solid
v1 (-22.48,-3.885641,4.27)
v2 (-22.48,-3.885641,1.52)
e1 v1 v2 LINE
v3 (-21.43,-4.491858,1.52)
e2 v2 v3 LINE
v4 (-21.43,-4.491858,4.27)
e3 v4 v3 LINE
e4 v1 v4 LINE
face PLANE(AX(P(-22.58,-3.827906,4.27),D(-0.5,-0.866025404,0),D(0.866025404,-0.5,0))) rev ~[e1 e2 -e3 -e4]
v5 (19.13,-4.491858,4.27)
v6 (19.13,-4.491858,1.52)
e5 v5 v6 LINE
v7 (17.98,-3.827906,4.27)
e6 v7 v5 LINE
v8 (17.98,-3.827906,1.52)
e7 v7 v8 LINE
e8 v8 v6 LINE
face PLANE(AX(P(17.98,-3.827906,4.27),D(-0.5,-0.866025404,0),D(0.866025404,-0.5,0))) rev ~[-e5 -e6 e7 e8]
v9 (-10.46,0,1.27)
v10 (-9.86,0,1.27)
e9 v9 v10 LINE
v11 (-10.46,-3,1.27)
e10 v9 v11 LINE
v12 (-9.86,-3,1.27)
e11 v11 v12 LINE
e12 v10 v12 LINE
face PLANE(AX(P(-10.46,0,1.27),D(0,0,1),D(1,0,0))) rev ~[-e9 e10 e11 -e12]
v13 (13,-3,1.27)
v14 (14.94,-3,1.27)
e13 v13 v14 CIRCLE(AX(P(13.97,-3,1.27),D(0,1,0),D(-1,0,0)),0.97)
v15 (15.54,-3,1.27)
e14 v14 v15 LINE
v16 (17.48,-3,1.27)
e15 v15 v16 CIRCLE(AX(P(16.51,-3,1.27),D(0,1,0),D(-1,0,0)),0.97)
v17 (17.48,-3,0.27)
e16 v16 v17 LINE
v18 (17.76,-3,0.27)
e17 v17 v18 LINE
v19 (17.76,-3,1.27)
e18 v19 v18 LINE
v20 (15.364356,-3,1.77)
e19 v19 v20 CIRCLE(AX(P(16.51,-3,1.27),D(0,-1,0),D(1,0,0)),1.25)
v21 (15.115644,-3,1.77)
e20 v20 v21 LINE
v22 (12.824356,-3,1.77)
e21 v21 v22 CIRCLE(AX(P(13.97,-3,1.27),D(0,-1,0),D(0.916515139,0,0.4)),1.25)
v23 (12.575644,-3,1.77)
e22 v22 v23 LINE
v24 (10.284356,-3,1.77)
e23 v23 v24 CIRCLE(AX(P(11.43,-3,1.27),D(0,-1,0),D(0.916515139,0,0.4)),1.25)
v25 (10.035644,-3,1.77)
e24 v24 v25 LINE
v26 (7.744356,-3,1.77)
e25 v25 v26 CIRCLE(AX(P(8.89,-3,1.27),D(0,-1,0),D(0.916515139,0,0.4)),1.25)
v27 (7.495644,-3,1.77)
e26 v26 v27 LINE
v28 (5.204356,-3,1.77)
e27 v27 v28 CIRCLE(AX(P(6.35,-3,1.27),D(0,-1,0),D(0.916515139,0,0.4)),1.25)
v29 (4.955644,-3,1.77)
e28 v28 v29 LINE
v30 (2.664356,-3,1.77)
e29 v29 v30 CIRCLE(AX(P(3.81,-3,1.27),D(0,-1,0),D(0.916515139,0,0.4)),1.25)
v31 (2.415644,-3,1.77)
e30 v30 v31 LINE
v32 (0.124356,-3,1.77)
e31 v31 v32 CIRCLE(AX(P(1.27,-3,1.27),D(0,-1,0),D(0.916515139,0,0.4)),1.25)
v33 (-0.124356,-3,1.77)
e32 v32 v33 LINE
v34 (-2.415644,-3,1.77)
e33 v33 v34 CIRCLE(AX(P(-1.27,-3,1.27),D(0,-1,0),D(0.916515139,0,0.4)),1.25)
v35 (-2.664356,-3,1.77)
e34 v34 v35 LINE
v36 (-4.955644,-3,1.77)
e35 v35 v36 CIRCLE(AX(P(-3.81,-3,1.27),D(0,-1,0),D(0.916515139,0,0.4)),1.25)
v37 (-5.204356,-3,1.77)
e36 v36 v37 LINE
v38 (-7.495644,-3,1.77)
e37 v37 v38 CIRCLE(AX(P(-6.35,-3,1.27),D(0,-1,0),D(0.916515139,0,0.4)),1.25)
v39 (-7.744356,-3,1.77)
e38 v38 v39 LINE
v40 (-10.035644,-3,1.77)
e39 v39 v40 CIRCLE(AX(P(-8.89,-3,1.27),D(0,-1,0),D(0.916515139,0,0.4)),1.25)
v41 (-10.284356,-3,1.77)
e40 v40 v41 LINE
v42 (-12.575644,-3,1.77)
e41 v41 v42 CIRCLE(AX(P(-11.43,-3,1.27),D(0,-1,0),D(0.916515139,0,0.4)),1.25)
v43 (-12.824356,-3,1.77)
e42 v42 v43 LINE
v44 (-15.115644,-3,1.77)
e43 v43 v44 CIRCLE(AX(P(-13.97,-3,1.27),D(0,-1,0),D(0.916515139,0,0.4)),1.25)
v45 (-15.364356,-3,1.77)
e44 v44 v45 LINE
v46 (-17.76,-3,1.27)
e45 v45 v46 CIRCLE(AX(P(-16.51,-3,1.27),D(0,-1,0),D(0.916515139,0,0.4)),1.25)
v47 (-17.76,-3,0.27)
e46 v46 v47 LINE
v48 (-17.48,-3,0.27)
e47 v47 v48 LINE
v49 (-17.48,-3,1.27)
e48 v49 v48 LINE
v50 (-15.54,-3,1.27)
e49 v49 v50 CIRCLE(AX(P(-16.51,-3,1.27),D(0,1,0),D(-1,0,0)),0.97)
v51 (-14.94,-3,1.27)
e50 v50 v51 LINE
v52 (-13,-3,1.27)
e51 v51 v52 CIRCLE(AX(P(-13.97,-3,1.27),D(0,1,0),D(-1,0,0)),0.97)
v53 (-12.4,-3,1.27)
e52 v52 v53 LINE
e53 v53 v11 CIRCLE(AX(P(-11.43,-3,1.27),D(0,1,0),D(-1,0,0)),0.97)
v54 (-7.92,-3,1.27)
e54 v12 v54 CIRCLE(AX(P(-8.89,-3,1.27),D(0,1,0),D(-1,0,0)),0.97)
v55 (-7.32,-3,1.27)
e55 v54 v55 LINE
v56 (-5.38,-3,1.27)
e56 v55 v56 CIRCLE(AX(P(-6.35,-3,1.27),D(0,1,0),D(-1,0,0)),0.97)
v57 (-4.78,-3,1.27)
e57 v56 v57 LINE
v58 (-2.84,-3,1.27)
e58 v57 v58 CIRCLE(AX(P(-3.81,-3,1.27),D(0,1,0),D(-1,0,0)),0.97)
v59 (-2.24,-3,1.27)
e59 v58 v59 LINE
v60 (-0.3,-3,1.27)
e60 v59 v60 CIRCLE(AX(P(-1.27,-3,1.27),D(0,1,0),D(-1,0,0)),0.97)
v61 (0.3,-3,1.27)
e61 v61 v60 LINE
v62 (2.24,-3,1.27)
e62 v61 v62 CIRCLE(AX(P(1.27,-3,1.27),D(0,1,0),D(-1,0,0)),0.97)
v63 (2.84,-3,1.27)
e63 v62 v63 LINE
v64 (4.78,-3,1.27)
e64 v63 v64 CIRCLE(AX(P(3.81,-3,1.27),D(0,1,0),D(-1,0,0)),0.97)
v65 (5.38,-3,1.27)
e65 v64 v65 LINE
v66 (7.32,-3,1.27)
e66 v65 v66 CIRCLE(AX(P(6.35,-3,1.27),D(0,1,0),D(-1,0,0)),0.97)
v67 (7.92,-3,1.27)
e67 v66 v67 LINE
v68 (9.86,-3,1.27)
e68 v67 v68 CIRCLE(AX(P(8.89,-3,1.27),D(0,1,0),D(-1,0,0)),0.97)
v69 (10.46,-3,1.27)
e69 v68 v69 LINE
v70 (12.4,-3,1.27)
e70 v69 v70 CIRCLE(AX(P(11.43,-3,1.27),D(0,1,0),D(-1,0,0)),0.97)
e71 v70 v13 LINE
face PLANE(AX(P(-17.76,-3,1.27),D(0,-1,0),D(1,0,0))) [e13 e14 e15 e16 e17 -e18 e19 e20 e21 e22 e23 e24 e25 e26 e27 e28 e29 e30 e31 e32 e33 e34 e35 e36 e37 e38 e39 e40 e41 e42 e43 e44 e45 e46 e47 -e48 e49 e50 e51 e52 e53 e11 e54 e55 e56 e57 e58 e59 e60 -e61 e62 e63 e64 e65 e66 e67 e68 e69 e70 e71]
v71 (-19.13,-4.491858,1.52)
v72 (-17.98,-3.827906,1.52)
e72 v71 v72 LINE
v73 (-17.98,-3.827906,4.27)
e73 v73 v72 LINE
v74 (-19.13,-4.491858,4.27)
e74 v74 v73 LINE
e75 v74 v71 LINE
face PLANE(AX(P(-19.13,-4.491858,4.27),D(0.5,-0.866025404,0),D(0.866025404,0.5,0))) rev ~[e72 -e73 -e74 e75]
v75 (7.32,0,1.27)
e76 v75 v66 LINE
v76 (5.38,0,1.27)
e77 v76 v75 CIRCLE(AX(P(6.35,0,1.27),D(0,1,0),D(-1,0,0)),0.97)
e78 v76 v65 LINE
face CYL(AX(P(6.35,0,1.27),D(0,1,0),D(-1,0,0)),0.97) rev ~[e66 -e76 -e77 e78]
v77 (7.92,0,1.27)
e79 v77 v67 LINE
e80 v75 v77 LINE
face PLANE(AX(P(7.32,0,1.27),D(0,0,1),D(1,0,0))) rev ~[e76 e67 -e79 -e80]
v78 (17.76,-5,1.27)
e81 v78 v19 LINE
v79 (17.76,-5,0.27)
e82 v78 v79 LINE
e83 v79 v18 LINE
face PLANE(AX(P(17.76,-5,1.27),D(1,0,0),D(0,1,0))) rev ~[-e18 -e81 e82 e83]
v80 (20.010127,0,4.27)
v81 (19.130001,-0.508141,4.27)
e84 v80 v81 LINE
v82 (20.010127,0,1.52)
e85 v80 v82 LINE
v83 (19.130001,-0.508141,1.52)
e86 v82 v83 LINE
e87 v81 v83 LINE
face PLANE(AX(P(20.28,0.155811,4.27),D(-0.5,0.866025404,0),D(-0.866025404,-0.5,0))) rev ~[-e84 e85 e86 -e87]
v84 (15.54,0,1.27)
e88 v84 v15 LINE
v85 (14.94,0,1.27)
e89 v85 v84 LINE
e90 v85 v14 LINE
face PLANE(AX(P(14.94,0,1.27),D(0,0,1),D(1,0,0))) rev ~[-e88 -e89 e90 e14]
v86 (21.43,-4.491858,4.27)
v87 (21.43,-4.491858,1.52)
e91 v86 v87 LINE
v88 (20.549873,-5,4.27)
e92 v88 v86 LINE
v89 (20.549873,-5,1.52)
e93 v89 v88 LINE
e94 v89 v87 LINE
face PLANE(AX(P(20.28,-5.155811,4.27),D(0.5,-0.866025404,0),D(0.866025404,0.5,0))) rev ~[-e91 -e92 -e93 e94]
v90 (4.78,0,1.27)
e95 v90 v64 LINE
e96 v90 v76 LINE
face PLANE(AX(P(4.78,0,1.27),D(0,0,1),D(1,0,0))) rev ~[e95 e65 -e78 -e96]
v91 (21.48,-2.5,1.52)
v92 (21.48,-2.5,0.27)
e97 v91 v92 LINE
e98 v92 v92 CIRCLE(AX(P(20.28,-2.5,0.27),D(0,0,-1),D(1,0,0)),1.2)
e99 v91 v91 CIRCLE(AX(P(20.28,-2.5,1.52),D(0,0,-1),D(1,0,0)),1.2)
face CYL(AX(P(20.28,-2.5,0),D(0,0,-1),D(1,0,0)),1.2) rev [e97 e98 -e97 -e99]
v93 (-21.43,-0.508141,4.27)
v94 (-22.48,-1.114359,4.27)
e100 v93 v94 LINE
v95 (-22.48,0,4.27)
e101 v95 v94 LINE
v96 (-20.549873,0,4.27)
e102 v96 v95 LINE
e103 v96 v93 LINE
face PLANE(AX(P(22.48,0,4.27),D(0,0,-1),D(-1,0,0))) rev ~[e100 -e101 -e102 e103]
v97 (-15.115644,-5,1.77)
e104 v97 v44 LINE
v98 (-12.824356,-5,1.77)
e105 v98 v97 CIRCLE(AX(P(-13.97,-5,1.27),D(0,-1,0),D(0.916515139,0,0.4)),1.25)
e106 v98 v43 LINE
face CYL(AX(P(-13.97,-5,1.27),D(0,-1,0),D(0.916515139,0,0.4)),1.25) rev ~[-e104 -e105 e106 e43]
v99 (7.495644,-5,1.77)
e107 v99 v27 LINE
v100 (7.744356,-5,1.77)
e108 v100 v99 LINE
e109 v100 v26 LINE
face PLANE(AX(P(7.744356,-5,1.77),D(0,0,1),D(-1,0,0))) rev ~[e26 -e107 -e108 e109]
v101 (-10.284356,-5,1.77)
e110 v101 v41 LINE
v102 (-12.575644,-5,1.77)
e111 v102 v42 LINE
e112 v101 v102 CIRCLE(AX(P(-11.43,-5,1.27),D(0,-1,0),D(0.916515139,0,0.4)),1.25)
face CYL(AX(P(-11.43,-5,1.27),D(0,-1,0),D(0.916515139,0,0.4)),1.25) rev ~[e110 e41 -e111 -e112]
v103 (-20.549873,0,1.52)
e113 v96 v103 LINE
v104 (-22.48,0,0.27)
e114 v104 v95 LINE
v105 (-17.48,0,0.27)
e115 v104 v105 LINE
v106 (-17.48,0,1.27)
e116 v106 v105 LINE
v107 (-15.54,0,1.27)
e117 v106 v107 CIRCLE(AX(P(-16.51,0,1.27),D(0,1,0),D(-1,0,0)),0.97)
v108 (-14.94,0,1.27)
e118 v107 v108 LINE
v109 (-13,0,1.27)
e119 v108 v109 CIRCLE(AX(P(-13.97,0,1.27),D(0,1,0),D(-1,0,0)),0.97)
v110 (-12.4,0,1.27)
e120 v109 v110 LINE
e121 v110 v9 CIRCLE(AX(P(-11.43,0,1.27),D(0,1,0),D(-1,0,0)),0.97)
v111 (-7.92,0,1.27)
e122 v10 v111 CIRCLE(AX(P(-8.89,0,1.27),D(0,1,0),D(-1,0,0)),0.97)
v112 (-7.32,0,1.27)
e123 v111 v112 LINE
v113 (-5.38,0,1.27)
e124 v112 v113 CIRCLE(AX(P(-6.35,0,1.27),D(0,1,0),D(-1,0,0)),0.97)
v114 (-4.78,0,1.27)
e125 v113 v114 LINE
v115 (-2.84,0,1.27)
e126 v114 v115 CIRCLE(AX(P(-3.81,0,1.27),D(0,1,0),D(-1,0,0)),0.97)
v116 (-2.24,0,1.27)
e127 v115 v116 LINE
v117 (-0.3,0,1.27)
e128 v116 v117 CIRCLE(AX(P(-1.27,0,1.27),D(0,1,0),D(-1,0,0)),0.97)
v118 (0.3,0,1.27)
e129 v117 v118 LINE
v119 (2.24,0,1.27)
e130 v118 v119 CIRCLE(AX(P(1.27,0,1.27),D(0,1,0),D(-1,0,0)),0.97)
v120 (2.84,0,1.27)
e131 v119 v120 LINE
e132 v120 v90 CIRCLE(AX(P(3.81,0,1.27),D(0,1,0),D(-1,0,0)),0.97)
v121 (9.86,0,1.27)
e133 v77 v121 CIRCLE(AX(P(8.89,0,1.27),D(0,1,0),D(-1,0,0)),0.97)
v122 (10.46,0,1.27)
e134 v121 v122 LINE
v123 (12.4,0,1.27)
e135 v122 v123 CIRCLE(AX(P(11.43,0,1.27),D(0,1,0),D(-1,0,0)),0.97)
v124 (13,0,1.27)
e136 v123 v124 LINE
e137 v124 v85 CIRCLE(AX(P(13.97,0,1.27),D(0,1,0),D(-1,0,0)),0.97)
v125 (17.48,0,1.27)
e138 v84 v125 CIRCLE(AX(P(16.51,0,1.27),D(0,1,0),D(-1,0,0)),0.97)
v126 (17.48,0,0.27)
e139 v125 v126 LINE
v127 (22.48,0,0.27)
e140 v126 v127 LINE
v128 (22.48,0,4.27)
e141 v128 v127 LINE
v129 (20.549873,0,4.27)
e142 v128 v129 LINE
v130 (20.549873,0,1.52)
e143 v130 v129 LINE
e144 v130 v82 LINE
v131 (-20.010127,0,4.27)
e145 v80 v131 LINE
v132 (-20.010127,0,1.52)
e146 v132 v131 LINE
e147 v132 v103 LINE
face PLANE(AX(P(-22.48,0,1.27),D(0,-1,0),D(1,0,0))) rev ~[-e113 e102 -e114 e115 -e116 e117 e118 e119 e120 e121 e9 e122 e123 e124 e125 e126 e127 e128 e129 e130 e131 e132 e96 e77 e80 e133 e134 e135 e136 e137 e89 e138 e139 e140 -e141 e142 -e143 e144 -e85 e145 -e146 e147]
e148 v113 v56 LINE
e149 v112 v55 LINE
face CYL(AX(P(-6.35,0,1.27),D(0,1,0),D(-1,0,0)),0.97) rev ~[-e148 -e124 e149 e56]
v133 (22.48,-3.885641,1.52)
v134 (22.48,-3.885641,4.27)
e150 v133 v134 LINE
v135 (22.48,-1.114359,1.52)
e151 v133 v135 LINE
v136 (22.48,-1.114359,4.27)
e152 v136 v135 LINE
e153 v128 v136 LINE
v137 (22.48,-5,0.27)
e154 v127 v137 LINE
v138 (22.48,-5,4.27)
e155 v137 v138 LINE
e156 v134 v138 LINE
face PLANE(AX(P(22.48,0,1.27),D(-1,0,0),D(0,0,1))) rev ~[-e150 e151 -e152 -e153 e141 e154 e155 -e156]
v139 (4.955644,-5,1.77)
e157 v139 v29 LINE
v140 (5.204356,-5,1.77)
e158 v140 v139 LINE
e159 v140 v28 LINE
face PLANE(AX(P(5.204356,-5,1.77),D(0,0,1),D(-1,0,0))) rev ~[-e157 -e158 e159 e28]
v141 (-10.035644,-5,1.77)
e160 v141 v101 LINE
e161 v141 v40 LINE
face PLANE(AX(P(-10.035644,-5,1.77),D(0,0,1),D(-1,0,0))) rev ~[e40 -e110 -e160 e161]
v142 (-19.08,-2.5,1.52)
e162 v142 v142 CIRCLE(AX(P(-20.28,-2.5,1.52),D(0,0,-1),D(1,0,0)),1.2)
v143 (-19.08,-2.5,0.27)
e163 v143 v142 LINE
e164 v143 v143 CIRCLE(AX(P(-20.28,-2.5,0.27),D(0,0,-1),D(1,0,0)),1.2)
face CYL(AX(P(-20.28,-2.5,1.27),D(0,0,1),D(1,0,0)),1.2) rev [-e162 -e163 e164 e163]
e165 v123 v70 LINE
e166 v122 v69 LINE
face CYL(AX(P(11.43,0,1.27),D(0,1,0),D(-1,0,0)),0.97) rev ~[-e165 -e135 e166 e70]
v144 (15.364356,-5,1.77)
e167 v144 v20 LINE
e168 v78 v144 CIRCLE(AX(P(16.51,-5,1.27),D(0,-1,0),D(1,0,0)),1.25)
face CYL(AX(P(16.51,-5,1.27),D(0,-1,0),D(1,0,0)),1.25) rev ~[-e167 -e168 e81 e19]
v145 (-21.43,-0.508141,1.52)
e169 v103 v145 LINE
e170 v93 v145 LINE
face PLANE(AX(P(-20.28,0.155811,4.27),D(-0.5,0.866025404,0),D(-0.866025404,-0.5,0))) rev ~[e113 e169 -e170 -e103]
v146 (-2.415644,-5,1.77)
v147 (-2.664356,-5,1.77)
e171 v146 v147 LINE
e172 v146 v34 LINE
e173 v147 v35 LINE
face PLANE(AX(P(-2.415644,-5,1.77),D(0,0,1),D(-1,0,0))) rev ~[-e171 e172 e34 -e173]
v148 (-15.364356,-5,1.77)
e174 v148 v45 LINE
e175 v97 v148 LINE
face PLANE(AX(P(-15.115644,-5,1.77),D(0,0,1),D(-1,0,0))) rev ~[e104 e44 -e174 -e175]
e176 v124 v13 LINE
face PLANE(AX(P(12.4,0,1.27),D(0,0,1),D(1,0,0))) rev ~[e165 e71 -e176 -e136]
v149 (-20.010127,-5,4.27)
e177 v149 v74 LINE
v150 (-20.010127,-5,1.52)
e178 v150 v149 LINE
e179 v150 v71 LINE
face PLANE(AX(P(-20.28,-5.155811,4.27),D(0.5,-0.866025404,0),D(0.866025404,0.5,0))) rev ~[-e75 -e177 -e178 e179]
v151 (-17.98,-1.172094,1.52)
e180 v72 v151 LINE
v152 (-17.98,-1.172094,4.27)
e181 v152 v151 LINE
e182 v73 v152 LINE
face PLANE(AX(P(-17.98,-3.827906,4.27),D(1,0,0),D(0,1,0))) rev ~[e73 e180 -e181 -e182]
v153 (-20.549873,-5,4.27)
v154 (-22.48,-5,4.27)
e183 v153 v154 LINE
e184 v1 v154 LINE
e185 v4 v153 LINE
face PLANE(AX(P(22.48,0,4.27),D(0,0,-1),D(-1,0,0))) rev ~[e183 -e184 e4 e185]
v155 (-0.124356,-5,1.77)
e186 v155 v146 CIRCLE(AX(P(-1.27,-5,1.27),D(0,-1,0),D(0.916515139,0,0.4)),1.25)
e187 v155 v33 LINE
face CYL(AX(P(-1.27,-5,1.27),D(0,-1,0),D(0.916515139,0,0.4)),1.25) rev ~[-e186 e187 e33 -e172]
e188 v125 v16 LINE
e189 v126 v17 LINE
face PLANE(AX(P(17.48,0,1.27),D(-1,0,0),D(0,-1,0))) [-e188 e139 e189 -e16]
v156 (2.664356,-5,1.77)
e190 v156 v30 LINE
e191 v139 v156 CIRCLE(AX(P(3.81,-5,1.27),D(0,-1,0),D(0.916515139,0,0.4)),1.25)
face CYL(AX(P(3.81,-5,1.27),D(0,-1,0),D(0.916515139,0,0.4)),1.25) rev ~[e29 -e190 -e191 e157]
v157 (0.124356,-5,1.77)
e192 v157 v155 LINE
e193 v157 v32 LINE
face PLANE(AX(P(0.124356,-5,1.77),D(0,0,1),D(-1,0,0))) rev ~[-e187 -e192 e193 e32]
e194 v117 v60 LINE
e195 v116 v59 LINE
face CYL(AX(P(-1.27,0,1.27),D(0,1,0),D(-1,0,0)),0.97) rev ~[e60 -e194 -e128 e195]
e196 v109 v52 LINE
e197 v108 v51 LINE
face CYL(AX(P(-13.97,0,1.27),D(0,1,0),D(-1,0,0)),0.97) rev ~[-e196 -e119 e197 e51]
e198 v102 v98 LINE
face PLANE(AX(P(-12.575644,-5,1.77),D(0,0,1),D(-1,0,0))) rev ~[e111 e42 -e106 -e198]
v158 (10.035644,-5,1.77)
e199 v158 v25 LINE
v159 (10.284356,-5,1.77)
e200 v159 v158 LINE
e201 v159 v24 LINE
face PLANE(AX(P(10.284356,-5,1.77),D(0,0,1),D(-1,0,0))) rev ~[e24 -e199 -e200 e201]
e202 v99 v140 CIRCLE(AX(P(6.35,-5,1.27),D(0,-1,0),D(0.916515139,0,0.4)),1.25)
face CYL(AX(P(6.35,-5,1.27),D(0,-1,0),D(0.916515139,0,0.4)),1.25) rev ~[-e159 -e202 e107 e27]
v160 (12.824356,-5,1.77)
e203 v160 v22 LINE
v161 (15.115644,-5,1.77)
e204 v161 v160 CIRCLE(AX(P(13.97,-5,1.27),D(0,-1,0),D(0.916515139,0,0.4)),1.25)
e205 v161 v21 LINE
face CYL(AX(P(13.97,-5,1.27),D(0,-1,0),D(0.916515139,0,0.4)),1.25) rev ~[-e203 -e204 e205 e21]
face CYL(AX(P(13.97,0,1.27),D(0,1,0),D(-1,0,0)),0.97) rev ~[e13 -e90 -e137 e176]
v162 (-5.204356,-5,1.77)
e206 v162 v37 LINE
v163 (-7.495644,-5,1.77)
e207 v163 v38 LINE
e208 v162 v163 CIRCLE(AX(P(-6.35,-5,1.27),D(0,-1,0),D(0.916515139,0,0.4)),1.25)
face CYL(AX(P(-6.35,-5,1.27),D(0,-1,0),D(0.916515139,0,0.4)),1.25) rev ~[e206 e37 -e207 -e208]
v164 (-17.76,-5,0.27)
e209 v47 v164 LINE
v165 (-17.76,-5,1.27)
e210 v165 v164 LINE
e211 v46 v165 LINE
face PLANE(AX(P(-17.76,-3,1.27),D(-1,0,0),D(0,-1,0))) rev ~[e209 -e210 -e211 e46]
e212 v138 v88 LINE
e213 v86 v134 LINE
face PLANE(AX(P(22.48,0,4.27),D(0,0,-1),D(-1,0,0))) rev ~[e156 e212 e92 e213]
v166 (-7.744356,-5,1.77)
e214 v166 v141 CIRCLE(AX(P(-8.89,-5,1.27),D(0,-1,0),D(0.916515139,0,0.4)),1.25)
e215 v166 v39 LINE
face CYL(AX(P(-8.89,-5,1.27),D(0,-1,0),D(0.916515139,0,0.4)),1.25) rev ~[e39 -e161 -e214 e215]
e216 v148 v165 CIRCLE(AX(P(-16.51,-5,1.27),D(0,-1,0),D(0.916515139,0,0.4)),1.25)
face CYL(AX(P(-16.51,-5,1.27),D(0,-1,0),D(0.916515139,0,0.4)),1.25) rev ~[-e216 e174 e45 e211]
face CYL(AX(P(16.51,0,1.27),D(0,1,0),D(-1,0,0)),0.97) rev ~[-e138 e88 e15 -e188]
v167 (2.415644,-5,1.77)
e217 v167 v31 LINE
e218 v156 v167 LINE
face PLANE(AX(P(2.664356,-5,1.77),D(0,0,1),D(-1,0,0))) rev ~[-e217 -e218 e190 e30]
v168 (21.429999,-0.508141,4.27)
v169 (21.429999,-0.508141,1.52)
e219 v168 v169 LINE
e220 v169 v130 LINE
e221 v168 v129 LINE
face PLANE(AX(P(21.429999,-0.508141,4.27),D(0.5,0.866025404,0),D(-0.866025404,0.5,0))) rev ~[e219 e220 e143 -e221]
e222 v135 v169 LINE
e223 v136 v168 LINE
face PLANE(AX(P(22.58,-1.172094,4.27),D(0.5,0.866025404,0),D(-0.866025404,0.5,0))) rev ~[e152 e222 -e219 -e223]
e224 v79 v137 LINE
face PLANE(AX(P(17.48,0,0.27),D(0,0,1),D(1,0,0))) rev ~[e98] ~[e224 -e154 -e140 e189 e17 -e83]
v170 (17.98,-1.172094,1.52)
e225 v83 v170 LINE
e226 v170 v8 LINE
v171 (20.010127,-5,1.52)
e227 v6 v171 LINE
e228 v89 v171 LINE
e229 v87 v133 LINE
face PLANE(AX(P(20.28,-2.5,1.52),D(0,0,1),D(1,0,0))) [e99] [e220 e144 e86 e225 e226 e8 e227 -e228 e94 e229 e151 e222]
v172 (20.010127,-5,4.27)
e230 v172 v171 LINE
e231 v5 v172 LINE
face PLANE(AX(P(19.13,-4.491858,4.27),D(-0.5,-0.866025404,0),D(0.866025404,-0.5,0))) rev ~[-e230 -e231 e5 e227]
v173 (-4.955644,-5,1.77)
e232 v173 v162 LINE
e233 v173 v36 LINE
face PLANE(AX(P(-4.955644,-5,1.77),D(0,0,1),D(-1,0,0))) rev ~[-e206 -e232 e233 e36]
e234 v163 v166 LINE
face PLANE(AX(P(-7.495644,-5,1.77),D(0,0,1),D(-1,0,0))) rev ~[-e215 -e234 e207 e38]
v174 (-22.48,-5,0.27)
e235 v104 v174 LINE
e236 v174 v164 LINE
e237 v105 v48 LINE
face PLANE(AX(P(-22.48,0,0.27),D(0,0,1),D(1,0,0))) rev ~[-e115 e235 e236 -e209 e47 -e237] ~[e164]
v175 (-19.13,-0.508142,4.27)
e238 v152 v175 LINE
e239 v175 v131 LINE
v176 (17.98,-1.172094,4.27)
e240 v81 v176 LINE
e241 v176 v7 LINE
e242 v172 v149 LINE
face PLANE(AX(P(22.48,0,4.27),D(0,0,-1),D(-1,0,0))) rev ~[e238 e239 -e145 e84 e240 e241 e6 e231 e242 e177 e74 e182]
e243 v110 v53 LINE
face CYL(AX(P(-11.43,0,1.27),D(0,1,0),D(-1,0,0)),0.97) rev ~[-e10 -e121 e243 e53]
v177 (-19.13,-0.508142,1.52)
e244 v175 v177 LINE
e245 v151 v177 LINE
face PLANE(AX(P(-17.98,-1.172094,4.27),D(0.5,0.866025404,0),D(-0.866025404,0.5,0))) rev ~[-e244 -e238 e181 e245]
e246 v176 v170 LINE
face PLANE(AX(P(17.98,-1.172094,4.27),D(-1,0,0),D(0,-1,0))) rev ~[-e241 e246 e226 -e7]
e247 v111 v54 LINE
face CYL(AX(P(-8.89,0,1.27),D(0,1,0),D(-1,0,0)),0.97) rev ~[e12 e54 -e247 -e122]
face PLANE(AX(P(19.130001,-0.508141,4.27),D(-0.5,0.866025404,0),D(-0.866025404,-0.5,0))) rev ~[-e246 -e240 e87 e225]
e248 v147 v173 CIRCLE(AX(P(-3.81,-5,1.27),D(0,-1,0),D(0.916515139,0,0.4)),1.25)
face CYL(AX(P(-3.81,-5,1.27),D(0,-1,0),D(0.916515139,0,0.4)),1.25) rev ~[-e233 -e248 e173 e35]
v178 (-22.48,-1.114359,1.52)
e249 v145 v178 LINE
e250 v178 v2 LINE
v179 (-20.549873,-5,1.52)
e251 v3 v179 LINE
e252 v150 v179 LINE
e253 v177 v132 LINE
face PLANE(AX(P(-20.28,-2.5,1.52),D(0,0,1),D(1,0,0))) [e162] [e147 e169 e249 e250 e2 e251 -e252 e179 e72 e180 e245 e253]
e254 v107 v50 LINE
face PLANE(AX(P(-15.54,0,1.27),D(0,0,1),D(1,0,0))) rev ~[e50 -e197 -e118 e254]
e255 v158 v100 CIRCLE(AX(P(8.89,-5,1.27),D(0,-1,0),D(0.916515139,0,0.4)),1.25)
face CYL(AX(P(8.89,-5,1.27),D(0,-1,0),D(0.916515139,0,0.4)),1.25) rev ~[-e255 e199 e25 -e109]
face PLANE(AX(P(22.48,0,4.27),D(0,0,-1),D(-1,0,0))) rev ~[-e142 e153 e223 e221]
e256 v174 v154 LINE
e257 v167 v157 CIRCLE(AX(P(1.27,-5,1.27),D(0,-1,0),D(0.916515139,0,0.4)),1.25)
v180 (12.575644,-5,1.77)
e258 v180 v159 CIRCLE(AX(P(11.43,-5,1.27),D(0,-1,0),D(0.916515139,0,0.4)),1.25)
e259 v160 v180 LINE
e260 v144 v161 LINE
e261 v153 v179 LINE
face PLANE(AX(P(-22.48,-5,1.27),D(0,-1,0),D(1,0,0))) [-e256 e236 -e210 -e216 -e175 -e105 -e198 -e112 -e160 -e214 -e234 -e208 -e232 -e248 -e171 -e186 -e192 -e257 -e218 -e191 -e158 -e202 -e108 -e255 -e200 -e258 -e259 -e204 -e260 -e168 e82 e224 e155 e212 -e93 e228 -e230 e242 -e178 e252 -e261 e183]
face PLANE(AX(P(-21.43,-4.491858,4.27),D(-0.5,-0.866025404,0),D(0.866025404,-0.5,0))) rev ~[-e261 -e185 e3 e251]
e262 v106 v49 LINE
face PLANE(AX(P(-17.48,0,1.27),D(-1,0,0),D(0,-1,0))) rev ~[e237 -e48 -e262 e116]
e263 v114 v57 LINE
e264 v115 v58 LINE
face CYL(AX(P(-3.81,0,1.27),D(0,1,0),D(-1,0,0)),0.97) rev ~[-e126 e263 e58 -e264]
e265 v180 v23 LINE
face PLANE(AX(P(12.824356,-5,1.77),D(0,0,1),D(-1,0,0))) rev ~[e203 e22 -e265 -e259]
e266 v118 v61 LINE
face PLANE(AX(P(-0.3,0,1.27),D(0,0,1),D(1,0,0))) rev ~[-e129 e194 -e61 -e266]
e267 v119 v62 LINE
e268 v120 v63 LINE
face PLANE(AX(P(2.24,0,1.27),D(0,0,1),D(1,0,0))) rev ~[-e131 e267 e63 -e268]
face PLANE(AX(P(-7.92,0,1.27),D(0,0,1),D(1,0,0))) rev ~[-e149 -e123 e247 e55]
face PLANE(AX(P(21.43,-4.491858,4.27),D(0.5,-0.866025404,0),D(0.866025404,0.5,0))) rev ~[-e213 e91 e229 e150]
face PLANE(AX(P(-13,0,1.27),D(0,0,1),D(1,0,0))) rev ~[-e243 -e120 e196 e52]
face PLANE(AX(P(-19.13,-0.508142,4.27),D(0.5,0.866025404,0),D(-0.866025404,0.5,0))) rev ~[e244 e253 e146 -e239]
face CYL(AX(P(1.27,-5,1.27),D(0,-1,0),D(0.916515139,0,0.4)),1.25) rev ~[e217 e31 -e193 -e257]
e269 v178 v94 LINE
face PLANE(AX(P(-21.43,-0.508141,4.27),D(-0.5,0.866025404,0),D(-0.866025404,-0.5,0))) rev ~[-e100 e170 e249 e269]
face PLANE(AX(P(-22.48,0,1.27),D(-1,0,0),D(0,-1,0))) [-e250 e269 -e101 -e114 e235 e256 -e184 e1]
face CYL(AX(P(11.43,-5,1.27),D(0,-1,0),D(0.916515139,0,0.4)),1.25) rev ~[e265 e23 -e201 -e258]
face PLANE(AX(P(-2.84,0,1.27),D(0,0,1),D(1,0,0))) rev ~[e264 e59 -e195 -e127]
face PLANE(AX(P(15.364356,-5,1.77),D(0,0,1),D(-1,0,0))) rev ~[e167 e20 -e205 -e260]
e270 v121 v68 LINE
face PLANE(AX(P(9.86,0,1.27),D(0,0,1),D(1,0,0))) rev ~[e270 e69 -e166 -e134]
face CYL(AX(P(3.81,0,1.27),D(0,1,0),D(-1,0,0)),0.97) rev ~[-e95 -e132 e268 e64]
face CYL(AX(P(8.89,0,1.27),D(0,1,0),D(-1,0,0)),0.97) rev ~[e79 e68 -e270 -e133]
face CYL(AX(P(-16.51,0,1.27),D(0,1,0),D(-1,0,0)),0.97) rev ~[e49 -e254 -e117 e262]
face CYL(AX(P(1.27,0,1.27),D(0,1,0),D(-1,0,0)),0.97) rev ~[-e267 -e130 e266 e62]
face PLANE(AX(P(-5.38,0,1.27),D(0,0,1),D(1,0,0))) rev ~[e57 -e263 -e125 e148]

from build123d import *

# Parameters (mm, degrees)
F1_DEPTH = 5
F3_DEPTH = 2
F5_DEPTH = 2.75
F6_R     = 1.2
F7_DEPTH = 5
F8_DEPTH = 1


with BuildPart() as f1:
    # F0 (on Front) → F1 (new body)
    with BuildSketch(Plane.XZ):
        with BuildLine():
            ThreePointArc((-2.24, 1.27), (-1.27, 2.24), (-0.3, 1.27))
            Line((-0.3, 1.27), (0.3, 1.27))
            ThreePointArc((0.3, 1.27), (1.27, 2.24), (2.24, 1.27))
            Line((2.24, 1.27), (2.84, 1.27))
            ThreePointArc((2.84, 1.27), (3.81, 2.24), (4.78, 1.27))
            Line((4.78, 1.27), (5.38, 1.27))
            ThreePointArc((5.38, 1.27), (6.35, 2.24), (7.32, 1.27))
            Line((7.32, 1.27), (7.92, 1.27))
            ThreePointArc((7.92, 1.27), (8.89, 2.24), (9.86, 1.27))
            Line((9.86, 1.27), (10.46, 1.27))
            ThreePointArc((10.46, 1.27), (11.43, 2.24), (12.4, 1.27))
            Line((12.4, 1.27), (13, 1.27))
            ThreePointArc((13, 1.27), (13.97, 2.24), (14.94, 1.27))
            Line((14.94, 1.27), (15.54, 1.27))
            ThreePointArc((15.54, 1.27), (16.51, 2.24), (17.48, 1.27))
            Line((17.48, 1.27), (22.48, 1.27))
            Line((22.48, 1.27), (22.48, 4.27))
            Line((22.48, 4.27), (-22.48, 4.27))
            Line((-22.48, 4.27), (-22.48, 1.27))
            Line((-22.48, 1.27), (-17.48, 1.27))
            ThreePointArc((-17.48, 1.27), (-16.51, 2.24), (-15.54, 1.27))
            Line((-15.54, 1.27), (-14.94, 1.27))
            ThreePointArc((-14.94, 1.27), (-13.97, 2.24), (-13, 1.27))
            Line((-13, 1.27), (-12.4, 1.27))
            ThreePointArc((-12.4, 1.27), (-11.43, 2.24), (-10.46, 1.27))
            Line((-10.46, 1.27), (-9.86, 1.27))
            ThreePointArc((-9.86, 1.27), (-8.89, 2.24), (-7.92, 1.27))
            Line((-7.92, 1.27), (-7.32, 1.27))
            ThreePointArc((-7.32, 1.27), (-6.35, 2.24), (-5.38, 1.27))
            Line((-5.38, 1.27), (-4.78, 1.27))
            ThreePointArc((-4.78, 1.27), (-3.81, 2.24), (-2.84, 1.27))
            Line((-2.84, 1.27), (-2.24, 1.27))
        make_face()
    extrude(amount=F1_DEPTH)

    # F2 (on face) → F3 (cut)
    with BuildSketch(Plane.XZ.offset(5)):
        with BuildLine():
            Line((-16.51, 1.27), (-15.26, 1.27))
            ThreePointArc((-15.26, 1.27), (-15.2863671088, 1.5253870546), (-15.3643560763, 1.77))
            Line((-15.3643560763, 1.77), (-16.51, 1.77))
            Line((-16.51, 1.77), (-16.51, 1.27))
        make_face()
        with BuildLine():
            ThreePointArc((-15.3643560763, 1.77), (-17.7336328912, 1.0146129454), (-15.26, 1.27))
            Line((-15.26, 1.27), (-16.51, 1.27))
            Line((-16.51, 1.27), (-16.51, 1.77))
            Line((-16.51, 1.77), (-15.3643560763, 1.77))
        make_face()
        with BuildLine():
            ThreePointArc((-15.3643560763, 1.77), (-15.2863671088, 1.5253870546), (-15.26, 1.27))
            Line((-15.26, 1.27), (-15.22, 1.27))
            ThreePointArc((-15.22, 1.27), (-15.1936328912, 1.5253870546), (-15.1156439237, 1.77))
            Line((-15.1156439237, 1.77), (-15.3643560763, 1.77))
        make_face()
        with BuildLine():
            Line((-12.72, 1.27), (-15.22, 1.27))
            ThreePointArc((-15.22, 1.27), (-13.97, 0.02), (-12.72, 1.27))
        make_face()
        with BuildLine():
            ThreePointArc((-15.1156439237, 1.77), (-15.1936328912, 1.5253870546), (-15.22, 1.27))
            Line((-15.22, 1.27), (-12.72, 1.27))
            ThreePointArc((-12.72, 1.27), (-12.7463671088, 1.5253870546), (-12.8243560763, 1.77))
            Line((-12.8243560763, 1.77), (-15.1156439237, 1.77))
        make_face()
        with BuildLine():
            ThreePointArc((-12.8243560763, 1.77), (-13.97, 2.52), (-15.1156439237, 1.77))
            Line((-15.1156439237, 1.77), (-12.8243560763, 1.77))
        make_face()
        with BuildLine():
            ThreePointArc((-12.8243560763, 1.77), (-12.7463671088, 1.5253870546), (-12.72, 1.27))
            Line((-12.72, 1.27), (-12.68, 1.27))
            ThreePointArc((-12.68, 1.27), (-12.6536328912, 1.5253870546), (-12.5756439237, 1.77))
            Line((-12.5756439237, 1.77), (-12.8243560763, 1.77))
        make_face()
        with BuildLine():
            Line((-10.18, 1.27), (-12.68, 1.27))
            ThreePointArc((-12.68, 1.27), (-11.43, 0.02), (-10.18, 1.27))
        make_face()
        with BuildLine():
            ThreePointArc((-12.5756439237, 1.77), (-12.6536328912, 1.5253870546), (-12.68, 1.27))
            Line((-12.68, 1.27), (-10.18, 1.27))
            ThreePointArc((-10.18, 1.27), (-10.2063671088, 1.5253870546), (-10.2843560763, 1.77))
            Line((-10.2843560763, 1.77), (-12.5756439237, 1.77))
        make_face()
        with BuildLine():
            ThreePointArc((-10.2843560763, 1.77), (-11.43, 2.52), (-12.5756439237, 1.77))
            Line((-12.5756439237, 1.77), (-10.2843560763, 1.77))
        make_face()
        with BuildLine():
            ThreePointArc((-10.2843560763, 1.77), (-10.2063671088, 1.5253870546), (-10.18, 1.27))
            Line((-10.18, 1.27), (-10.14, 1.27))
            ThreePointArc((-10.14, 1.27), (-10.1136328912, 1.5253870546), (-10.0356439237, 1.77))
            Line((-10.0356439237, 1.77), (-10.2843560763, 1.77))
        make_face()
        with BuildLine():
            Line((-7.64, 1.27), (-10.14, 1.27))
            ThreePointArc((-10.14, 1.27), (-8.89, 0.02), (-7.64, 1.27))
        make_face()
        with BuildLine():
            ThreePointArc((-10.0356439237, 1.77), (-10.1136328912, 1.5253870546), (-10.14, 1.27))
            Line((-10.14, 1.27), (-7.64, 1.27))
            ThreePointArc((-7.64, 1.27), (-7.6663671088, 1.5253870546), (-7.7443560763, 1.77))
            Line((-7.7443560763, 1.77), (-10.0356439237, 1.77))
        make_face()
        with BuildLine():
            ThreePointArc((-7.7443560763, 1.77), (-8.89, 2.52), (-10.0356439237, 1.77))
            Line((-10.0356439237, 1.77), (-7.7443560763, 1.77))
        make_face()
        with BuildLine():
            ThreePointArc((-7.7443560763, 1.77), (-7.6663671088, 1.5253870546), (-7.64, 1.27))
            Line((-7.64, 1.27), (-7.6, 1.27))
            ThreePointArc((-7.6, 1.27), (-7.5736328912, 1.5253870546), (-7.4956439237, 1.77))
            Line((-7.4956439237, 1.77), (-7.7443560763, 1.77))
        make_face()
        with BuildLine():
            Line((-5.1, 1.27), (-7.6, 1.27))
            ThreePointArc((-7.6, 1.27), (-6.35, 0.02), (-5.1, 1.27))
        make_face()
        with BuildLine():
            ThreePointArc((-7.4956439237, 1.77), (-7.5736328912, 1.5253870546), (-7.6, 1.27))
            Line((-7.6, 1.27), (-5.1, 1.27))
            ThreePointArc((-5.1, 1.27), (-5.1263671088, 1.5253870546), (-5.2043560763, 1.77))
            Line((-5.2043560763, 1.77), (-7.4956439237, 1.77))
        make_face()
        with BuildLine():
            ThreePointArc((-5.2043560763, 1.77), (-6.35, 2.52), (-7.4956439237, 1.77))
            Line((-7.4956439237, 1.77), (-5.2043560763, 1.77))
        make_face()
        with BuildLine():
            ThreePointArc((-5.2043560763, 1.77), (-5.1263671088, 1.5253870546), (-5.1, 1.27))
            Line((-5.1, 1.27), (-5.06, 1.27))
            ThreePointArc((-5.06, 1.27), (-5.0336328912, 1.5253870546), (-4.9556439237, 1.77))
            Line((-4.9556439237, 1.77), (-5.2043560763, 1.77))
        make_face()
        with BuildLine():
            Line((-2.56, 1.27), (-5.06, 1.27))
            ThreePointArc((-5.06, 1.27), (-3.81, 0.02), (-2.56, 1.27))
        make_face()
        with BuildLine():
            ThreePointArc((-4.9556439237, 1.77), (-5.0336328912, 1.5253870546), (-5.06, 1.27))
            Line((-5.06, 1.27), (-2.56, 1.27))
            ThreePointArc((-2.56, 1.27), (-2.5863671088, 1.5253870546), (-2.6643560763, 1.77))
            Line((-2.6643560763, 1.77), (-4.9556439237, 1.77))
        make_face()
        with BuildLine():
            ThreePointArc((-2.6643560763, 1.77), (-3.81, 2.52), (-4.9556439237, 1.77))
            Line((-4.9556439237, 1.77), (-2.6643560763, 1.77))
        make_face()
        with BuildLine():
            ThreePointArc((-2.6643560763, 1.77), (-2.5863671088, 1.5253870546), (-2.56, 1.27))
            Line((-2.56, 1.27), (-2.52, 1.27))
            ThreePointArc((-2.52, 1.27), (-2.4936328912, 1.5253870546), (-2.4156439237, 1.77))
            Line((-2.4156439237, 1.77), (-2.6643560763, 1.77))
        make_face()
        with BuildLine():
            Line((-0.02, 1.27), (-2.52, 1.27))
            ThreePointArc((-2.52, 1.27), (-1.27, 0.02), (-0.02, 1.27))
        make_face()
        with BuildLine():
            ThreePointArc((-2.4156439237, 1.77), (-2.4936328912, 1.5253870546), (-2.52, 1.27))
            Line((-2.52, 1.27), (-0.02, 1.27))
            ThreePointArc((-0.02, 1.27), (-0.0463671088, 1.5253870546), (-0.1243560763, 1.77))
            Line((-0.1243560763, 1.77), (-2.4156439237, 1.77))
        make_face()
        with BuildLine():
            ThreePointArc((-0.1243560763, 1.77), (-1.27, 2.52), (-2.4156439237, 1.77))
            Line((-2.4156439237, 1.77), (-0.1243560763, 1.77))
        make_face()
        with BuildLine():
            ThreePointArc((-0.1243560763, 1.77), (-0.0463671088, 1.5253870546), (-0.02, 1.27))
            Line((-0.02, 1.27), (0.02, 1.27))
            ThreePointArc((0.02, 1.27), (0.0463671088, 1.5253870546), (0.1243560763, 1.77))
            Line((0.1243560763, 1.77), (-0.1243560763, 1.77))
        make_face()
        with BuildLine():
            Line((2.52, 1.27), (0.02, 1.27))
            ThreePointArc((0.02, 1.27), (1.27, 0.02), (2.52, 1.27))
        make_face()
        with BuildLine():
            ThreePointArc((0.1243560763, 1.77), (0.0463671088, 1.5253870546), (0.02, 1.27))
            Line((0.02, 1.27), (2.52, 1.27))
            ThreePointArc((2.52, 1.27), (2.4936328912, 1.5253870546), (2.4156439237, 1.77))
            Line((2.4156439237, 1.77), (0.1243560763, 1.77))
        make_face()
        with BuildLine():
            ThreePointArc((2.4156439237, 1.77), (1.27, 2.52), (0.1243560763, 1.77))
            Line((0.1243560763, 1.77), (2.4156439237, 1.77))
        make_face()
        with BuildLine():
            ThreePointArc((2.4156439237, 1.77), (2.4936328912, 1.5253870546), (2.52, 1.27))
            Line((2.52, 1.27), (2.56, 1.27))
            ThreePointArc((2.56, 1.27), (2.5863671088, 1.5253870546), (2.6643560763, 1.77))
            Line((2.6643560763, 1.77), (2.4156439237, 1.77))
        make_face()
        with BuildLine():
            Line((5.06, 1.27), (2.56, 1.27))
            ThreePointArc((2.56, 1.27), (3.81, 0.02), (5.06, 1.27))
        make_face()
        with BuildLine():
            ThreePointArc((2.6643560763, 1.77), (2.5863671088, 1.5253870546), (2.56, 1.27))
            Line((2.56, 1.27), (5.06, 1.27))
            ThreePointArc((5.06, 1.27), (5.0336328912, 1.5253870546), (4.9556439237, 1.77))
            Line((4.9556439237, 1.77), (2.6643560763, 1.77))
        make_face()
        with BuildLine():
            ThreePointArc((4.9556439237, 1.77), (3.81, 2.52), (2.6643560763, 1.77))
            Line((2.6643560763, 1.77), (4.9556439237, 1.77))
        make_face()
        with BuildLine():
            ThreePointArc((4.9556439237, 1.77), (5.0336328912, 1.5253870546), (5.06, 1.27))
            Line((5.06, 1.27), (5.1, 1.27))
            ThreePointArc((5.1, 1.27), (5.1263671088, 1.5253870546), (5.2043560763, 1.77))
            Line((5.2043560763, 1.77), (4.9556439237, 1.77))
        make_face()
        with BuildLine():
            Line((7.6, 1.27), (5.1, 1.27))
            ThreePointArc((5.1, 1.27), (6.35, 0.02), (7.6, 1.27))
        make_face()
        with BuildLine():
            ThreePointArc((5.2043560763, 1.77), (5.1263671088, 1.5253870546), (5.1, 1.27))
            Line((5.1, 1.27), (7.6, 1.27))
            ThreePointArc((7.6, 1.27), (7.5736328912, 1.5253870546), (7.4956439237, 1.77))
            Line((7.4956439237, 1.77), (5.2043560763, 1.77))
        make_face()
        with BuildLine():
            ThreePointArc((7.4956439237, 1.77), (6.35, 2.52), (5.2043560763, 1.77))
            Line((5.2043560763, 1.77), (7.4956439237, 1.77))
        make_face()
        with BuildLine():
            ThreePointArc((7.4956439237, 1.77), (7.5736328912, 1.5253870546), (7.6, 1.27))
            Line((7.6, 1.27), (7.64, 1.27))
            ThreePointArc((7.64, 1.27), (7.6663671088, 1.5253870546), (7.7443560763, 1.77))
            Line((7.7443560763, 1.77), (7.4956439237, 1.77))
        make_face()
        with BuildLine():
            Line((10.14, 1.27), (7.64, 1.27))
            ThreePointArc((7.64, 1.27), (8.89, 0.02), (10.14, 1.27))
        make_face()
        with BuildLine():
            ThreePointArc((7.7443560763, 1.77), (7.6663671088, 1.5253870546), (7.64, 1.27))
            Line((7.64, 1.27), (10.14, 1.27))
            ThreePointArc((10.14, 1.27), (10.1136328912, 1.5253870546), (10.0356439237, 1.77))
            Line((10.0356439237, 1.77), (7.7443560763, 1.77))
        make_face()
        with BuildLine():
            ThreePointArc((10.0356439237, 1.77), (8.89, 2.52), (7.7443560763, 1.77))
            Line((7.7443560763, 1.77), (10.0356439237, 1.77))
        make_face()
        with BuildLine():
            ThreePointArc((10.0356439237, 1.77), (10.1136328912, 1.5253870546), (10.14, 1.27))
            Line((10.14, 1.27), (10.18, 1.27))
            ThreePointArc((10.18, 1.27), (10.2063671088, 1.5253870546), (10.2843560763, 1.77))
            Line((10.2843560763, 1.77), (10.0356439237, 1.77))
        make_face()
        with BuildLine():
            Line((12.68, 1.27), (10.18, 1.27))
            ThreePointArc((10.18, 1.27), (11.43, 0.02), (12.68, 1.27))
        make_face()
        with BuildLine():
            ThreePointArc((10.2843560763, 1.77), (10.2063671088, 1.5253870546), (10.18, 1.27))
            Line((10.18, 1.27), (12.68, 1.27))
            ThreePointArc((12.68, 1.27), (12.6536328912, 1.5253870546), (12.5756439237, 1.77))
            Line((12.5756439237, 1.77), (10.2843560763, 1.77))
        make_face()
        with BuildLine():
            ThreePointArc((12.5756439237, 1.77), (11.43, 2.52), (10.2843560763, 1.77))
            Line((10.2843560763, 1.77), (12.5756439237, 1.77))
        make_face()
        with BuildLine():
            ThreePointArc((12.5756439237, 1.77), (12.6536328912, 1.5253870546), (12.68, 1.27))
            Line((12.68, 1.27), (12.72, 1.27))
            ThreePointArc((12.72, 1.27), (12.7463671088, 1.5253870546), (12.8243560763, 1.77))
            Line((12.8243560763, 1.77), (12.5756439237, 1.77))
        make_face()
        with BuildLine():
            Line((15.22, 1.27), (12.72, 1.27))
            ThreePointArc((12.72, 1.27), (13.97, 0.02), (15.22, 1.27))
        make_face()
        with BuildLine():
            ThreePointArc((12.8243560763, 1.77), (12.7463671088, 1.5253870546), (12.72, 1.27))
            Line((12.72, 1.27), (15.22, 1.27))
            ThreePointArc((15.22, 1.27), (15.1936328912, 1.5253870546), (15.1156439237, 1.77))
            Line((15.1156439237, 1.77), (12.8243560763, 1.77))
        make_face()
        with BuildLine():
            ThreePointArc((15.1156439237, 1.77), (13.97, 2.52), (12.8243560763, 1.77))
            Line((12.8243560763, 1.77), (15.1156439237, 1.77))
        make_face()
        with BuildLine():
            ThreePointArc((15.1156439237, 1.77), (15.1936328912, 1.5253870546), (15.22, 1.27))
            Line((15.22, 1.27), (15.26, 1.27))
            ThreePointArc((15.26, 1.27), (15.2863671088, 1.5253870546), (15.3643560763, 1.77))
            Line((15.3643560763, 1.77), (15.1156439237, 1.77))
        make_face()
        with BuildLine():
            Line((16.51, 1.27), (15.26, 1.27))
            ThreePointArc((15.26, 1.27), (16.51, 0.02), (17.76, 1.27))
            ThreePointArc((17.76, 1.27), (16.7653870546, 2.4936328912), (15.3643560763, 1.77))
            Line((15.3643560763, 1.77), (16.51, 1.77))
            Line((16.51, 1.77), (16.51, 1.27))
        make_face()
        with BuildLine():
            ThreePointArc((15.3643560763, 1.77), (15.2863671088, 1.5253870546), (15.26, 1.27))
            Line((15.26, 1.27), (16.51, 1.27))
            Line((16.51, 1.27), (16.51, 1.77))
            Line((16.51, 1.77), (15.3643560763, 1.77))
        make_face()
    extrude(amount=-F3_DEPTH, mode=Mode.SUBTRACT)

    # F4 (on face) → F5 (cut)
    with BuildSketch(Plane.XY.offset(4.27)):
        with BuildLine():
            ThreePointArc((21.4299999725, -4.4918584446), (22.2718584208, -3.6500000137), (22.58, -2.5))
            ThreePointArc((22.58, -2.5), (22.271858109, -1.3499994462), (21.4299988924, -0.5081409318))
            ThreePointArc((21.4299988924, -0.5081409318), (20.280000147, -0.2), (19.1300013622, -0.5081407848))
            ThreePointArc((19.1300013622, -0.5081407848), (18.2881419645, -1.3499993189), (17.98, -2.5))
            ThreePointArc((17.98, -2.5), (18.2881415897, -3.6500000318), (19.1300000637, -4.4918584655))
            ThreePointArc((19.1300000637, -4.4918584655), (20.2800000209, -4.8), (21.4299999725, -4.4918584446))
        make_face()
        with BuildLine():
            Line((22.58, -3.8279056191), (22.58, -2.5))
            ThreePointArc((22.58, -2.5), (22.2718584208, -3.6500000137), (21.4299999725, -4.4918584446))
            Line((21.4299999725, -4.4918584446), (22.58, -3.8279056191))
        make_face()
        with BuildLine():
            ThreePointArc((21.4299988924, -0.5081409318), (22.271858109, -1.3499994462), (22.58, -2.5))
            Line((22.58, -2.5), (22.58, -1.1720943809))
            Line((22.58, -1.1720943809), (21.4299988924, -0.5081409318))
        make_face()
        with BuildLine():
            ThreePointArc((19.1300013622, -0.5081407848), (20.280000147, -0.2), (21.4299988924, -0.5081409318))
            Line((21.4299988924, -0.5081409318), (20.28, 0.1558112383))
            Line((20.28, 0.1558112383), (19.1300013622, -0.5081407848))
        make_face()
        with BuildLine():
            Line((20.28, -5.1558112383), (21.4299999725, -4.4918584446))
            ThreePointArc((21.4299999725, -4.4918584446), (20.2800000209, -4.8), (19.1300000637, -4.4918584655))
            Line((19.1300000637, -4.4918584655), (20.28, -5.1558112383))
        make_face()
        with BuildLine():
            ThreePointArc((17.98, -2.5), (18.2881419645, -1.3499993189), (19.1300013622, -0.5081407848))
            Line((19.1300013622, -0.5081407848), (17.98, -1.1720943809))
            Line((17.98, -1.1720943809), (17.98, -2.5))
        make_face()
        with BuildLine():
            Line((17.98, -3.8279056191), (19.1300000637, -4.4918584655))
            ThreePointArc((19.1300000637, -4.4918584655), (18.2881415897, -3.6500000318), (17.98, -2.5))
            Line((17.98, -2.5), (17.98, -3.8279056191))
        make_face()
        with BuildLine():
            ThreePointArc((-19.1300000861, -4.4918584784), (-18.2881415961, -3.650000043), (-17.98, -2.5))
            ThreePointArc((-17.98, -2.5), (-18.2881415051, -1.3500001146), (-19.1299997708, -0.5081417036))
            ThreePointArc((-19.1299997708, -0.5081417036), (-20.2799996458, -0.2), (-21.4299996157, -0.5081413494))
            ThreePointArc((-21.4299996157, -0.5081413494), (-22.2718583178, -1.3499998079), (-22.58, -2.5))
            ThreePointArc((-22.58, -2.5), (-22.2718584103, -3.6500000318), (-21.4299999363, -4.4918584655))
            ThreePointArc((-21.4299999363, -4.4918584655), (-20.2800000129, -4.8), (-19.1300000861, -4.4918584784))
        make_face()
        with BuildLine():
            Line((-17.98, -3.8279056191), (-17.98, -2.5))
            ThreePointArc((-17.98, -2.5), (-18.2881415961, -3.650000043), (-19.1300000861, -4.4918584784))
            Line((-19.1300000861, -4.4918584784), (-17.98, -3.8279056191))
        make_face()
        with BuildLine():
            ThreePointArc((-19.1299997708, -0.5081417036), (-18.2881415051, -1.3500001146), (-17.98, -2.5))
            Line((-17.98, -2.5), (-17.98, -1.1720943809))
            Line((-17.98, -1.1720943809), (-19.1299997708, -0.5081417036))
        make_face()
        with BuildLine():
            ThreePointArc((-21.4299996157, -0.5081413494), (-20.2799996458, -0.2), (-19.1299997708, -0.5081417036))
            Line((-19.1299997708, -0.5081417036), (-20.28, 0.1558112383))
            Line((-20.28, 0.1558112383), (-21.4299996157, -0.5081413494))
        make_face()
        with BuildLine():
            Line((-20.28, -5.1558112383), (-19.1300000861, -4.4918584784))
            ThreePointArc((-19.1300000861, -4.4918584784), (-20.2800000129, -4.8), (-21.4299999363, -4.4918584655))
            Line((-21.4299999363, -4.4918584655), (-20.28, -5.1558112383))
        make_face()
        with BuildLine():
            ThreePointArc((-22.58, -2.5), (-22.2718583178, -1.3499998079), (-21.4299996157, -0.5081413494))
            Line((-21.4299996157, -0.5081413494), (-22.58, -1.1720943809))
            Line((-22.58, -1.1720943809), (-22.58, -2.5))
        make_face()
        with BuildLine():
            Line((-22.58, -3.8279056191), (-21.4299999363, -4.4918584655))
            ThreePointArc((-21.4299999363, -4.4918584655), (-22.2718584103, -3.6500000318), (-22.58, -2.5))
            Line((-22.58, -2.5), (-22.58, -3.8279056191))
        make_face()
    extrude(amount=-F5_DEPTH, mode=Mode.SUBTRACT)

    # F6 (on Top) → F7 (cut)
    with BuildSketch(Plane.XY):
        with Locations((-20.28, -2.5)):
            Circle(F6_R)
        with Locations((20.28, -2.5)):
            Circle(F6_R)
    extrude(amount=F7_DEPTH, mode=Mode.SUBTRACT)

    # F8 (add): faces of the model
    f8_faces = [f1.faces().sort_by_distance(p)[0] for p in [
        (-19.98, -0.0707106781, 1.27),
        (19.98, -0.0707106781, 1.27),
    ]]
    extrude(f8_faces, amount=F8_DEPTH)


solid = f1.part
